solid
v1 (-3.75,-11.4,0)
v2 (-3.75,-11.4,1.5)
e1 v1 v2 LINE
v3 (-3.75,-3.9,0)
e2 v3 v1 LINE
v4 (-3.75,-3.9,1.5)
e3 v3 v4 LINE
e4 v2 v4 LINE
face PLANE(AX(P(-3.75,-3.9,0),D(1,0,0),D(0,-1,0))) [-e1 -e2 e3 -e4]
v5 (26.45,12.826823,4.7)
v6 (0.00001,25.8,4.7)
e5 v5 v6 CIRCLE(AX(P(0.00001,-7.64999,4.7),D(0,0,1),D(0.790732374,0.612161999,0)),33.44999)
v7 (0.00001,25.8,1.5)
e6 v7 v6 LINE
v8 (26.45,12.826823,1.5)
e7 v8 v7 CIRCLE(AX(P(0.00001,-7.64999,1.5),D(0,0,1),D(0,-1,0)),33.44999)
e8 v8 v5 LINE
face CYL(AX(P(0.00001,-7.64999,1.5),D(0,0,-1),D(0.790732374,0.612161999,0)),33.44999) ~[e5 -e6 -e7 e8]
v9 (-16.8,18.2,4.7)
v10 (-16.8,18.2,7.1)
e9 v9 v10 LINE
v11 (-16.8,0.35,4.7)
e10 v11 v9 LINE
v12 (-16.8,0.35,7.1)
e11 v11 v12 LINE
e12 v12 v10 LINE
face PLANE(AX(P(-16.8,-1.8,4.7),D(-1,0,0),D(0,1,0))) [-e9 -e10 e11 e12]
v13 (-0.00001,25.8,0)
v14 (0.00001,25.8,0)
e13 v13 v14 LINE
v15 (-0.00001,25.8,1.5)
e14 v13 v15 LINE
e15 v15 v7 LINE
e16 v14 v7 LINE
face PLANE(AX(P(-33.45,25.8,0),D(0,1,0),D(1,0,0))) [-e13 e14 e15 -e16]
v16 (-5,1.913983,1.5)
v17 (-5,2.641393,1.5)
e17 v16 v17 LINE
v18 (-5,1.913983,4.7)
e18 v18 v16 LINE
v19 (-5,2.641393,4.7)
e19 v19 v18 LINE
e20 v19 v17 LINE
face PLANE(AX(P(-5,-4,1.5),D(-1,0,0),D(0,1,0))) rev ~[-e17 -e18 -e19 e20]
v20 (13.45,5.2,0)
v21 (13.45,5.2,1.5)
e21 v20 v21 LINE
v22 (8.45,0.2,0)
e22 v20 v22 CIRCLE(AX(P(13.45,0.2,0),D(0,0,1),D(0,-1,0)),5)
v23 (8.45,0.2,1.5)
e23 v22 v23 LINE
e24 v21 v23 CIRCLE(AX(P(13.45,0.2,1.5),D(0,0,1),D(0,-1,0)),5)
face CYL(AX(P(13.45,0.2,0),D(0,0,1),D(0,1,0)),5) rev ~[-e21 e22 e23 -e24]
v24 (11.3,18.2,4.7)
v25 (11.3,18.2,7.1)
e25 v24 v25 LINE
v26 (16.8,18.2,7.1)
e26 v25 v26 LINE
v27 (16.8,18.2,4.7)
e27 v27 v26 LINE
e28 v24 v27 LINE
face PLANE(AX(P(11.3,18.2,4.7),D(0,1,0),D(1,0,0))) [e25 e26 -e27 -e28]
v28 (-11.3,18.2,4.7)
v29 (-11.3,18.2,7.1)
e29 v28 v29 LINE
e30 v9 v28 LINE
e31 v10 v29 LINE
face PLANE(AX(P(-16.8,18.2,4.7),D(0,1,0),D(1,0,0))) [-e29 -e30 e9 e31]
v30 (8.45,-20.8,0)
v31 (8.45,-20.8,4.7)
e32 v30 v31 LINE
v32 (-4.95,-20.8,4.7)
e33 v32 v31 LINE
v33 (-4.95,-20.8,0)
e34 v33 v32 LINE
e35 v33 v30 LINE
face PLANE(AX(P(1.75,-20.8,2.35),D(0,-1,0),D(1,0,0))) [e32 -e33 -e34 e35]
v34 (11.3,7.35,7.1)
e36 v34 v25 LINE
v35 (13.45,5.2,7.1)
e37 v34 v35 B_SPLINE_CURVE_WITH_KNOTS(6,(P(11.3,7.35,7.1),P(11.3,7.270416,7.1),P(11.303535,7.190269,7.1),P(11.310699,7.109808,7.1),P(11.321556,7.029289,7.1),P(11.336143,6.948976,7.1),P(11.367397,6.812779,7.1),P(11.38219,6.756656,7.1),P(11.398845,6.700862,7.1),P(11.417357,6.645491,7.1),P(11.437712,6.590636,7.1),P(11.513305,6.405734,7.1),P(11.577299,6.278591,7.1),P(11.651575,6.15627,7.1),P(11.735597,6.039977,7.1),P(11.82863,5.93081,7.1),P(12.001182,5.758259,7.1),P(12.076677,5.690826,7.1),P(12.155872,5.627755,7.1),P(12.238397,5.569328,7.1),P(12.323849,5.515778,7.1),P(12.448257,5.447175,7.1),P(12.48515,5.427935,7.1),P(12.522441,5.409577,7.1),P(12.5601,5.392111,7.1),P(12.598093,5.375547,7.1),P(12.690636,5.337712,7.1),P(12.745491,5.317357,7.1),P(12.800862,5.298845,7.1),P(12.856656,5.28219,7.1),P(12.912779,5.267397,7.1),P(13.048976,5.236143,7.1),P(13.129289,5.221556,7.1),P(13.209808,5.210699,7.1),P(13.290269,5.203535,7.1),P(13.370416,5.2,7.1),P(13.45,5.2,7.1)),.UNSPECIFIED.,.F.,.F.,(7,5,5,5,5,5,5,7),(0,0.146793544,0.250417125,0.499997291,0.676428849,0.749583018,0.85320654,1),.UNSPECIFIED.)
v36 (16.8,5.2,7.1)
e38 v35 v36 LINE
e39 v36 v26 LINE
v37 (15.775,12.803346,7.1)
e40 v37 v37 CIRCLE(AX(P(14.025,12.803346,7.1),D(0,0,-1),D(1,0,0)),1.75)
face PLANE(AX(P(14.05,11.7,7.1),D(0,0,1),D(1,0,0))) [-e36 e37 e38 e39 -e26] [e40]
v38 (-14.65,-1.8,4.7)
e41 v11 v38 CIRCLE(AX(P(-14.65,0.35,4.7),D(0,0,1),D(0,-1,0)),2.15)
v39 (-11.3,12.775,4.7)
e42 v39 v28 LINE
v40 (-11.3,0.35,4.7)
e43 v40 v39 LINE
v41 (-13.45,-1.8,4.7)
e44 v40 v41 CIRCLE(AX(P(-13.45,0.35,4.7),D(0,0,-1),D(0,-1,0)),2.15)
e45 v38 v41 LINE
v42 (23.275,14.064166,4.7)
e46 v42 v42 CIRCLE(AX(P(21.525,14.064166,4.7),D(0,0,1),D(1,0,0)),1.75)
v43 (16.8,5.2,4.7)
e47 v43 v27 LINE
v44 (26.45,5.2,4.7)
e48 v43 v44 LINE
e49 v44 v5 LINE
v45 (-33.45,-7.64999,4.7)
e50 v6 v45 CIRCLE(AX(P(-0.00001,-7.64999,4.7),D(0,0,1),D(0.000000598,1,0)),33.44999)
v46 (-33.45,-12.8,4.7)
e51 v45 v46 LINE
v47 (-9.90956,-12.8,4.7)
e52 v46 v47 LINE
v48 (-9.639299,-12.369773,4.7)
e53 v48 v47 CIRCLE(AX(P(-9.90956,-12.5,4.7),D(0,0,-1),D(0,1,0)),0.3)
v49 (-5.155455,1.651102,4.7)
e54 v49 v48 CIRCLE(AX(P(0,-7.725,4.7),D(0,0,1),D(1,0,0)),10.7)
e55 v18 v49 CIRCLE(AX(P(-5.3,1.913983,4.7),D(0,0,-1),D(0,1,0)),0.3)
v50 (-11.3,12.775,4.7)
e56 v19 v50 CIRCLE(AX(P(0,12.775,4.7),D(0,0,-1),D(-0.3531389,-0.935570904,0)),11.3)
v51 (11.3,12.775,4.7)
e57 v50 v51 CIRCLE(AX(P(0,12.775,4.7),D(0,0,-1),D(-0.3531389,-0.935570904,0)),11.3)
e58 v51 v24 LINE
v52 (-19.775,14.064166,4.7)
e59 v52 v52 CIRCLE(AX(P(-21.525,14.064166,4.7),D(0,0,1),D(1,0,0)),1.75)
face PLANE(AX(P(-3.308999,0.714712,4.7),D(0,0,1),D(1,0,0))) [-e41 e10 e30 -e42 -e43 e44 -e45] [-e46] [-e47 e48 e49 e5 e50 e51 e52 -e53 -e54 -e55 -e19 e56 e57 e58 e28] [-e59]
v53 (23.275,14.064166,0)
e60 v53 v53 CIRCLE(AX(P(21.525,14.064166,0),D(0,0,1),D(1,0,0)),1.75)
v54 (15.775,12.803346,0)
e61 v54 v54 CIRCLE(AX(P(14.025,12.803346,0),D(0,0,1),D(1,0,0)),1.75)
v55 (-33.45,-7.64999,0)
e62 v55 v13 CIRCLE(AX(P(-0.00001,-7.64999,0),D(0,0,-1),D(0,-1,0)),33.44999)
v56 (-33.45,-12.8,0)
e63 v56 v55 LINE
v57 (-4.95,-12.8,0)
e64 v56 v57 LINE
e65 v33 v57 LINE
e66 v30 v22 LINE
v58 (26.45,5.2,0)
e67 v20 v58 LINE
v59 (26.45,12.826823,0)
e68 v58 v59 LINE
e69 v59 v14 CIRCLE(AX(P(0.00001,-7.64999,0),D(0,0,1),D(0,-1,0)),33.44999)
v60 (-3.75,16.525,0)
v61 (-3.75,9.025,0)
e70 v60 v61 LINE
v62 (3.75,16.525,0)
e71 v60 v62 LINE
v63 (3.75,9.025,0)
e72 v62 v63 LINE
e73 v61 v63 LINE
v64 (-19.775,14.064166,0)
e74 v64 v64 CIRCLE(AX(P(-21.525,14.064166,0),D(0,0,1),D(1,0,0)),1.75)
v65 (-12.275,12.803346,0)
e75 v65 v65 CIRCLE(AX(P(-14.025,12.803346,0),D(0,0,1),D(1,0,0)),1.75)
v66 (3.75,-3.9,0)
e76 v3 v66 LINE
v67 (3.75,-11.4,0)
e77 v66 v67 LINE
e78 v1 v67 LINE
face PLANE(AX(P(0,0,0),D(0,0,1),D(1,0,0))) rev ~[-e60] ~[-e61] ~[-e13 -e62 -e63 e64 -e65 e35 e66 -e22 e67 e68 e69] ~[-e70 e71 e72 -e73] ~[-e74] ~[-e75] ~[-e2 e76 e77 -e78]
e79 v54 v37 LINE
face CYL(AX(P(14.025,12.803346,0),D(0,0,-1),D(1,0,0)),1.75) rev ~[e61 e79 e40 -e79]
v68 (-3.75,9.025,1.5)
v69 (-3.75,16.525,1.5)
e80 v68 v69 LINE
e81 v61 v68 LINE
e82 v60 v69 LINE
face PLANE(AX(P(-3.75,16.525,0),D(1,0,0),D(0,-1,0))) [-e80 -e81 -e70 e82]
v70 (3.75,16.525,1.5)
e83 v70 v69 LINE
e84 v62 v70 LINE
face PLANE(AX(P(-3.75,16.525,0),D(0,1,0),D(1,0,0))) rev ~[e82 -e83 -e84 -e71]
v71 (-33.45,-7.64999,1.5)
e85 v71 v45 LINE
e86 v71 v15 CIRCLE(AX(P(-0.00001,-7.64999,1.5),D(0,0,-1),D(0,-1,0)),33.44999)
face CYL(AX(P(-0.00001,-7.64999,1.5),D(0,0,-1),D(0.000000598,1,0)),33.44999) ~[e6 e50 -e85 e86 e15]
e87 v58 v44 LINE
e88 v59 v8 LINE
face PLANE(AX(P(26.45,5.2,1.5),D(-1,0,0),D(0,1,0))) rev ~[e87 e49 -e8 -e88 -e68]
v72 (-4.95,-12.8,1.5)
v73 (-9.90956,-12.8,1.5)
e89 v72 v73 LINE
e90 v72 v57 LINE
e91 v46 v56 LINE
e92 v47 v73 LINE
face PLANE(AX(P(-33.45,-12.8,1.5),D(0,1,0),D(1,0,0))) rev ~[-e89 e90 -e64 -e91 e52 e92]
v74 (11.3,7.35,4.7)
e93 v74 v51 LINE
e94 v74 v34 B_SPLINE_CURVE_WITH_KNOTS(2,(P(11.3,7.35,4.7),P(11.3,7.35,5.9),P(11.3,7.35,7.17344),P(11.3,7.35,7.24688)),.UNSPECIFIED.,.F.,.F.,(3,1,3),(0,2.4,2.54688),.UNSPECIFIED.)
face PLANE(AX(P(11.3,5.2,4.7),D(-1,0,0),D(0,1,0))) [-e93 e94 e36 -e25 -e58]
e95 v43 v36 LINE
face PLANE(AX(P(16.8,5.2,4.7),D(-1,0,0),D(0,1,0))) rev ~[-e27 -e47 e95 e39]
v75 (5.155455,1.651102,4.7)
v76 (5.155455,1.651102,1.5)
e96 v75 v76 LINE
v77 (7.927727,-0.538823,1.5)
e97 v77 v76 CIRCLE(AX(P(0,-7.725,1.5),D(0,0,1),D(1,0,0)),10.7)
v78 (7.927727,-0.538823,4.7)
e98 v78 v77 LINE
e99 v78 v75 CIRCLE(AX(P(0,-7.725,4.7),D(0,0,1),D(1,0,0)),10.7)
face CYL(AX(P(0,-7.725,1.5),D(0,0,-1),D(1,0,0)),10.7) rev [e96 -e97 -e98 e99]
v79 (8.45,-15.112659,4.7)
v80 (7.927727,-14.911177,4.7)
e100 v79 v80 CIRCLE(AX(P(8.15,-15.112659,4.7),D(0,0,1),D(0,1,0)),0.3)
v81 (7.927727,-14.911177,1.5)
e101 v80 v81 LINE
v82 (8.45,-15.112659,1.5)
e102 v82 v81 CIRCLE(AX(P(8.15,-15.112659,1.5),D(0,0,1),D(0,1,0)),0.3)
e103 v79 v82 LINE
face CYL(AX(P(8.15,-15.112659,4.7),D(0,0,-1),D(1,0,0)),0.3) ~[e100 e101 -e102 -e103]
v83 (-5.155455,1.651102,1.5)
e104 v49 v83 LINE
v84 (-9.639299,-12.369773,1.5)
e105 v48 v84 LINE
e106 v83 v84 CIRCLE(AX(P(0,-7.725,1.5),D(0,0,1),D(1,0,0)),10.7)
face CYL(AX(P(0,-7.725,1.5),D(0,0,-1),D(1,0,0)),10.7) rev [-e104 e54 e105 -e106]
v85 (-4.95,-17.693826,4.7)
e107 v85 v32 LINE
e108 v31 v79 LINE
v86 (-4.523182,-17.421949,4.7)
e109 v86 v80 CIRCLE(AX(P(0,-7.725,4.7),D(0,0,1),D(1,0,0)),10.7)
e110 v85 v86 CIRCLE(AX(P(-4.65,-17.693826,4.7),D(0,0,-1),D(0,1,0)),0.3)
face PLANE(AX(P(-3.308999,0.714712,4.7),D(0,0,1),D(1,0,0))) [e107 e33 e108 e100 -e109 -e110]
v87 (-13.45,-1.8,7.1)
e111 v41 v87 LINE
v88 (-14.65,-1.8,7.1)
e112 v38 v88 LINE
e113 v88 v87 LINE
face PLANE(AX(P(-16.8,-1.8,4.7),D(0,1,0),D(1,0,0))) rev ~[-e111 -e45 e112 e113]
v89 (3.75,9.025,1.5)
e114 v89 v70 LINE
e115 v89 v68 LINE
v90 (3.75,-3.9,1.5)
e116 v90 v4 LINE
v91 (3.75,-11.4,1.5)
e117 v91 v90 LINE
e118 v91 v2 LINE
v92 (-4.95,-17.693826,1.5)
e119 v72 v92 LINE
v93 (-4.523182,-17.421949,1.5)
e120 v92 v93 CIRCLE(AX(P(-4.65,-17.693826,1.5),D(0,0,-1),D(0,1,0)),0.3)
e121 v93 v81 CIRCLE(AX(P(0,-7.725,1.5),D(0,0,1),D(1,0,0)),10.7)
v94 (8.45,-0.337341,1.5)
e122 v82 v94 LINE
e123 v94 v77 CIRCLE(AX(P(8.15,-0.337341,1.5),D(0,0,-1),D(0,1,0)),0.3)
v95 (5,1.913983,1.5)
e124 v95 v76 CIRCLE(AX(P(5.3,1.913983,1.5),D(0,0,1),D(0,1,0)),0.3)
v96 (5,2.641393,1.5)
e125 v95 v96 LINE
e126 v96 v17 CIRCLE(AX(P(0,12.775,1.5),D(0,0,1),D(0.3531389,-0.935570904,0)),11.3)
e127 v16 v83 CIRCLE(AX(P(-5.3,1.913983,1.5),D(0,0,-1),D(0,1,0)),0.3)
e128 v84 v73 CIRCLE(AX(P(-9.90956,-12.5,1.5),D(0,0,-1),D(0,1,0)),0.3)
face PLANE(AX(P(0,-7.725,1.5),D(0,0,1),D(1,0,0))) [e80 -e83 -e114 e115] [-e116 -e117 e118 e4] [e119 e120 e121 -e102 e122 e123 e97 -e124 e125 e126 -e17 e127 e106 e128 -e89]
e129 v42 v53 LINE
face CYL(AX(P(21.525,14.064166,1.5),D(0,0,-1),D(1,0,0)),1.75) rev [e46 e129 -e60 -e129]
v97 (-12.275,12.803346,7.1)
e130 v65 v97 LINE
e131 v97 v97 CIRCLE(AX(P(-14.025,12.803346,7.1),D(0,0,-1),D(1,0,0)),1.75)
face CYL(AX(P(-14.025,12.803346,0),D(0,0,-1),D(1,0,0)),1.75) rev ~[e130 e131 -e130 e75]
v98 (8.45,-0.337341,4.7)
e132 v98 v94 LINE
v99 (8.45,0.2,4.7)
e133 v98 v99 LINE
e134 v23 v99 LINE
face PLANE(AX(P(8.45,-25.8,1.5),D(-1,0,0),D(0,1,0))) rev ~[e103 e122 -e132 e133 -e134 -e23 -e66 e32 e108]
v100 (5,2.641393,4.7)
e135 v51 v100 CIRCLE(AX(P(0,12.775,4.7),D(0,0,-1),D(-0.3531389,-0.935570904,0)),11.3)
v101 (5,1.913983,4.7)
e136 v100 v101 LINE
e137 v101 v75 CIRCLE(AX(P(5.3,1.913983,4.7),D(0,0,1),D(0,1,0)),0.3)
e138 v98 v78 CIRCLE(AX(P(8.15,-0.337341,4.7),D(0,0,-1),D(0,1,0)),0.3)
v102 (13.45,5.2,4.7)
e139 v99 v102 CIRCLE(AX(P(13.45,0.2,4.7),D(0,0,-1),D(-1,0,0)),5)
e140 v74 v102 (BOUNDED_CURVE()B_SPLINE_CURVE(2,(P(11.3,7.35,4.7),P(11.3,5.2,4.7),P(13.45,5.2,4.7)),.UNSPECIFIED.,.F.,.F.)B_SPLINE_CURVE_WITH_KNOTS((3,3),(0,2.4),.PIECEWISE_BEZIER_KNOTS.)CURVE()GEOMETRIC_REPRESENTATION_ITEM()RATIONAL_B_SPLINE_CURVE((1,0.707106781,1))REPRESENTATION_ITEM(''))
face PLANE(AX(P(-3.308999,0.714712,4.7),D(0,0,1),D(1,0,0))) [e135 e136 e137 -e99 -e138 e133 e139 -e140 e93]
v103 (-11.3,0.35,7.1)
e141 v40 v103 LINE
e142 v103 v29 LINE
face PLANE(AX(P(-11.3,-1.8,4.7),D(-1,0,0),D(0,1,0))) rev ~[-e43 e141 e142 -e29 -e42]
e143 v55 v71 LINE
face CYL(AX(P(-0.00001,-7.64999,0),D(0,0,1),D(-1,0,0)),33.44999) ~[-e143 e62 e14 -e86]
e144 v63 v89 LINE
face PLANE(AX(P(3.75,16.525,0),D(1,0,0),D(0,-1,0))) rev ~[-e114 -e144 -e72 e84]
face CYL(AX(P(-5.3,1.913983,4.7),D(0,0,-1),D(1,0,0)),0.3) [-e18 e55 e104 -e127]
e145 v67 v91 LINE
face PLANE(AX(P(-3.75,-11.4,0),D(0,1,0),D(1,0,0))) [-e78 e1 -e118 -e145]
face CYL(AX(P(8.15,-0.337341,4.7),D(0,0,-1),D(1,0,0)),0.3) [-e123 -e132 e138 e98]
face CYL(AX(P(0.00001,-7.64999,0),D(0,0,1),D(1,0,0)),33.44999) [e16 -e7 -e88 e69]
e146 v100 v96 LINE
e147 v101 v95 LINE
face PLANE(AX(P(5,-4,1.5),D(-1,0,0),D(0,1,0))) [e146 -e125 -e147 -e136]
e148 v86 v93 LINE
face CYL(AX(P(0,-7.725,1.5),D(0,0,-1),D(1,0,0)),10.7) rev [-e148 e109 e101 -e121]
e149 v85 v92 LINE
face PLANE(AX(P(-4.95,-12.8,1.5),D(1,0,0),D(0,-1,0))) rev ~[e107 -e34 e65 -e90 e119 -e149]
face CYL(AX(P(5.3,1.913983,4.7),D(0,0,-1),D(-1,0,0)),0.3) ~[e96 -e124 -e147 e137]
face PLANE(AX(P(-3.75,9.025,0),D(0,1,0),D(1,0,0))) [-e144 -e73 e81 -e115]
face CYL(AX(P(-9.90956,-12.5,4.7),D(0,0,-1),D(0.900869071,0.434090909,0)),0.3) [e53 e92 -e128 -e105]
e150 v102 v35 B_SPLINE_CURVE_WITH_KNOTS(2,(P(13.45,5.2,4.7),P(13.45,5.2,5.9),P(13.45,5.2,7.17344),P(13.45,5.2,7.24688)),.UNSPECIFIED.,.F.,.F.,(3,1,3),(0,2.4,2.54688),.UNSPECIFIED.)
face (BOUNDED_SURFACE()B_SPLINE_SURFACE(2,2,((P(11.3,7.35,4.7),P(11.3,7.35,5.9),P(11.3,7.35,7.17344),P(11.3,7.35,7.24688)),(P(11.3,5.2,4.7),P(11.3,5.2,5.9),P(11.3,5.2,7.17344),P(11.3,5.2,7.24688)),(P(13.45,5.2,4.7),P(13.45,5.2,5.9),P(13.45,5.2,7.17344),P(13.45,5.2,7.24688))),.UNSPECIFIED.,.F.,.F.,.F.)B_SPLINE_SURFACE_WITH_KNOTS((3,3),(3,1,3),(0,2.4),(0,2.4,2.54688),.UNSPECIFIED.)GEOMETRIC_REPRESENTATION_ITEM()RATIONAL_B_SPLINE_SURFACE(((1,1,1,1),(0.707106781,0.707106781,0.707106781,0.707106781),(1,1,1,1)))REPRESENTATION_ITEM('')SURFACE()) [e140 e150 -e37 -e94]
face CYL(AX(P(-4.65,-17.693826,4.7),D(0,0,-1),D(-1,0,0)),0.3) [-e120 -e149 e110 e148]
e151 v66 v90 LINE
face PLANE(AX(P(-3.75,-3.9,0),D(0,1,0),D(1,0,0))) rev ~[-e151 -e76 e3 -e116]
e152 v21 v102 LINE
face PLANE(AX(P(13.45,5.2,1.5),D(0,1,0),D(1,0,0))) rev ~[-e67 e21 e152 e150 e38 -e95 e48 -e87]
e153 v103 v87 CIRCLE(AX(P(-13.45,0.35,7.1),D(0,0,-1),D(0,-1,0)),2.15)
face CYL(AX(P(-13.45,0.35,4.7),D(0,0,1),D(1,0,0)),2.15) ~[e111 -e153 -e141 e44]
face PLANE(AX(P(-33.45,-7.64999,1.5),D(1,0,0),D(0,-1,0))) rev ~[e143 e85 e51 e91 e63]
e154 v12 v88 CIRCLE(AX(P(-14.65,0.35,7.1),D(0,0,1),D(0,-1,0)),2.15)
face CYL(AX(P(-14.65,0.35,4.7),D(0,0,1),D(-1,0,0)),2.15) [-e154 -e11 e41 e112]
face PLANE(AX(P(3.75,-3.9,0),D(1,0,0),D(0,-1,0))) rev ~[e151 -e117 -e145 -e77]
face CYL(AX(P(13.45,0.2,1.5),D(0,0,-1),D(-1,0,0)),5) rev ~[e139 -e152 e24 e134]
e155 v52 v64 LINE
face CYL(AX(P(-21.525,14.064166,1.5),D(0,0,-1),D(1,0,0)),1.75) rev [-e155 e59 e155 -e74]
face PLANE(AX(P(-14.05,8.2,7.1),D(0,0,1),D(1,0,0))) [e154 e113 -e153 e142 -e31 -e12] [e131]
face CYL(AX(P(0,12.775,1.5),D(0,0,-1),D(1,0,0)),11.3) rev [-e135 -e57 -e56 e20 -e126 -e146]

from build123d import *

# Parameters (mm, degrees)
F0_W      = 66.9
F0_H      = 51.6
F1_DEPTH  = 1.5
F2_R      = 33.44999
F3_R      = 1.75
F5_DEPTH  = 10
F6_W      = 60
F6_H      = 1.5
F7_DEPTH  = 7
F8_W      = 28.5
F8_H      = 1.5
F9_DEPTH  = 13
F10_W     = 18
F10_H     = 1.5
F11_DEPTH = 31
F12_R     = 5
F13_R     = 1.75
F13_R_2   = 11.3
F15_DEPTH = 3.2
F16_R     = 10.7
F17_DEPTH = 3.2
F18_W     = 10
F18_H     = 8
F19_DEPTH = 5
F14_W     = 7.5
F14_H     = 7.5
F20_DEPTH = 25
F21_W     = 13.4
F21_H     = 4.7
F22_DEPTH = 5
F23_W     = 5.5
F23_H     = 20
F23_H_2   = 13
F24_DEPTH = 2.4
F25_R     = 1.75
F26_DEPTH = 25
F27_R     = 2.15
F28_R     = 0.3


# Not quite as in the source:
# - a fillet or chamfer is up to 0.001 mm smaller than in the source, because OpenCascade refuses the exact size
# - ends of sketch curves that miss each other by under 0.0002 mm in the source are joined


with BuildPart() as f1:
    # F0 (on Top) → F1 (new body)
    with BuildSketch(Plane.XY):
        Rectangle(F0_W, F0_H)
    extrude(amount=F1_DEPTH)

    # F2 (radius 33.45 in the source; OpenCascade refuses exactly that, so slightly less here)
    f2_edges = [f1.edges().sort_by_distance(p)[0] for p in [
        (-33.45, 25.8, 0.75),
        (33.45, 25.8, 0.75),
    ]]
    fillet(f2_edges, radius=F2_R)

    # F3 (on Top) → F5 (cut)
    with BuildSketch(Plane.XY):
        with Locations((-21.525, 14.0641658831)):
            Circle(F3_R)
        with Locations((-14.025, 12.8033463032)):
            Circle(F3_R)
        with Locations((21.525, 14.0641658831)):
            Circle(F3_R)
        with Locations((14.025, 12.8033463032)):
            Circle(F3_R)
    extrude(amount=F5_DEPTH, mode=Mode.SUBTRACT)

    # F6 (on face) → F7 (cut)
    with BuildSketch(Plane.YZ.offset(33.45)):
        with Locations((4.2, 0.75)):
            Rectangle(F6_W, F6_H)
    extrude(amount=-F7_DEPTH, mode=Mode.SUBTRACT)

    # F8 (on face) → F9 (cut)
    with BuildSketch(Plane.XZ.offset(25.8)):
        with Locations((-19.2, 0.75)):
            Rectangle(F8_W, F8_H)
    extrude(amount=-F9_DEPTH, mode=Mode.SUBTRACT)

    # F10 (on face) → F11 (cut)
    with BuildSketch(Plane.XZ.offset(25.8)):
        with Locations((17.45, 0.75)):
            Rectangle(F10_W, F10_H)
    extrude(amount=-F11_DEPTH, mode=Mode.SUBTRACT)

    # F12
    f12_edges = [f1.edges().sort_by_distance(p)[0] for p in [
        (8.45, 5.2, 0.75),
    ]]
    fillet(f12_edges, radius=F12_R)

    # F13 (on face) → F15 (join)
    with BuildSketch(Plane.XY.offset(1.5)):
        with BuildLine():
            ThreePointArc((8.45, 0.2), (9.9144660941, 3.7355339059), (13.45, 5.2))
            Line((13.45, 5.2), (26.45, 5.2))
            Line((26.45, 5.2), (26.45, 12.8268227403))
            ThreePointArc((26.45, 12.8268227403), (14.7301262522, 22.3820846236), (1e-05, 25.8))
            ThreePointArc((1e-05, 25.8), (-23.6527247596, 16.0027247596), (-33.45, -7.64999))
            Line((-33.45, -7.64999), (-33.45, -12.8))
            Line((-33.45, -12.8), (-4.95, -12.8))
            Line((-4.95, -12.8), (-4.95, -25.8))
            Line((-4.95, -25.8), (8.45, -25.8))
            Line((8.45, -25.8), (8.45, 0.2))
        make_face()
        with Locations((-14.025, 12.8033463032)):
            Circle(F13_R, mode=Mode.SUBTRACT)
        with Locations((-21.525, 14.0641658831)):
            Circle(F13_R, mode=Mode.SUBTRACT)
        with Locations((0, 12.775)):
            Circle(F13_R_2, mode=Mode.SUBTRACT)
        with Locations((14.025, 12.8033463032)):
            Circle(F13_R, mode=Mode.SUBTRACT)
        with Locations((21.525, 14.0641658831)):
            Circle(F13_R, mode=Mode.SUBTRACT)
    extrude(amount=F15_DEPTH)

    # F16 (on face) → F17 (cut)
    with BuildSketch(Plane.XY.offset(1.5)):
        with Locations((0, -7.725)):
            Circle(F16_R)
    extrude(amount=F17_DEPTH, mode=Mode.SUBTRACT)

    # F18 (on face) → F19 (cut)
    with BuildSketch(Plane.XY.offset(1.5)):
        Rectangle(F18_W, F18_H)
    extrude(amount=F19_DEPTH, mode=Mode.SUBTRACT)

    # F14 (on face) → F20 (cut)
    with BuildSketch(Plane(origin=(0, 0, 0), x_dir=(1, 0, 0), z_dir=(0, 0, -1))):
        with Locations((0, -12.775)):
            Rectangle(F14_W, F14_H)
        with Locations((0, 7.65)):
            Rectangle(F14_W, F14_H)
    extrude(amount=-F20_DEPTH, mode=Mode.SUBTRACT)

    # F21 (on face) → F22 (cut)
    with BuildSketch(Plane.XZ.offset(25.8)):
        with Locations((1.75, 2.35)):
            Rectangle(F21_W, F21_H)
    extrude(amount=-F22_DEPTH, mode=Mode.SUBTRACT)

    # F23 (on face) → F24 (join)
    with BuildSketch(Plane.XY.offset(4.7)):
        with Locations((-14.05, 8.2)):
            Rectangle(F23_W, F23_H)
        with Locations((14.05, 11.7)):
            Rectangle(F23_W, F23_H_2)
    extrude(amount=F24_DEPTH)

    # F25 (on face) → F26 (cut)
    with BuildSketch(Plane(origin=(0, 0, 0), x_dir=(1, 0, 0), z_dir=(0, 0, -1))):
        with Locations((14.025, -12.8033463032)):
            Circle(F25_R)
        with Locations((-14.025, -12.8033463032)):
            Circle(F25_R)
    extrude(amount=-F26_DEPTH, mode=Mode.SUBTRACT)

    # F27
    f27_edges = [f1.edges().sort_by_distance(p)[0] for p in [
        (11.3, 5.2, 5.9),
        (-11.3, -1.8, 5.9),
        (-16.8, -1.8, 5.9),
    ]]
    fillet(f27_edges, radius=F27_R)

    # F28
    f28_edges = [f1.edges().sort_by_distance(p)[0] for p in [
        (-9.419893, -12.8, 3.1),
        (5, 1.734915, 3.1),
        (8.45, -1.160893, 3.1),
        (8.45, -14.289107, 3.1),
        (-4.95, -17.211174, 3.1),
        (-5, 1.734915, 3.1),
    ]]
    fillet(f28_edges, radius=F28_R)


solid = f1.part
